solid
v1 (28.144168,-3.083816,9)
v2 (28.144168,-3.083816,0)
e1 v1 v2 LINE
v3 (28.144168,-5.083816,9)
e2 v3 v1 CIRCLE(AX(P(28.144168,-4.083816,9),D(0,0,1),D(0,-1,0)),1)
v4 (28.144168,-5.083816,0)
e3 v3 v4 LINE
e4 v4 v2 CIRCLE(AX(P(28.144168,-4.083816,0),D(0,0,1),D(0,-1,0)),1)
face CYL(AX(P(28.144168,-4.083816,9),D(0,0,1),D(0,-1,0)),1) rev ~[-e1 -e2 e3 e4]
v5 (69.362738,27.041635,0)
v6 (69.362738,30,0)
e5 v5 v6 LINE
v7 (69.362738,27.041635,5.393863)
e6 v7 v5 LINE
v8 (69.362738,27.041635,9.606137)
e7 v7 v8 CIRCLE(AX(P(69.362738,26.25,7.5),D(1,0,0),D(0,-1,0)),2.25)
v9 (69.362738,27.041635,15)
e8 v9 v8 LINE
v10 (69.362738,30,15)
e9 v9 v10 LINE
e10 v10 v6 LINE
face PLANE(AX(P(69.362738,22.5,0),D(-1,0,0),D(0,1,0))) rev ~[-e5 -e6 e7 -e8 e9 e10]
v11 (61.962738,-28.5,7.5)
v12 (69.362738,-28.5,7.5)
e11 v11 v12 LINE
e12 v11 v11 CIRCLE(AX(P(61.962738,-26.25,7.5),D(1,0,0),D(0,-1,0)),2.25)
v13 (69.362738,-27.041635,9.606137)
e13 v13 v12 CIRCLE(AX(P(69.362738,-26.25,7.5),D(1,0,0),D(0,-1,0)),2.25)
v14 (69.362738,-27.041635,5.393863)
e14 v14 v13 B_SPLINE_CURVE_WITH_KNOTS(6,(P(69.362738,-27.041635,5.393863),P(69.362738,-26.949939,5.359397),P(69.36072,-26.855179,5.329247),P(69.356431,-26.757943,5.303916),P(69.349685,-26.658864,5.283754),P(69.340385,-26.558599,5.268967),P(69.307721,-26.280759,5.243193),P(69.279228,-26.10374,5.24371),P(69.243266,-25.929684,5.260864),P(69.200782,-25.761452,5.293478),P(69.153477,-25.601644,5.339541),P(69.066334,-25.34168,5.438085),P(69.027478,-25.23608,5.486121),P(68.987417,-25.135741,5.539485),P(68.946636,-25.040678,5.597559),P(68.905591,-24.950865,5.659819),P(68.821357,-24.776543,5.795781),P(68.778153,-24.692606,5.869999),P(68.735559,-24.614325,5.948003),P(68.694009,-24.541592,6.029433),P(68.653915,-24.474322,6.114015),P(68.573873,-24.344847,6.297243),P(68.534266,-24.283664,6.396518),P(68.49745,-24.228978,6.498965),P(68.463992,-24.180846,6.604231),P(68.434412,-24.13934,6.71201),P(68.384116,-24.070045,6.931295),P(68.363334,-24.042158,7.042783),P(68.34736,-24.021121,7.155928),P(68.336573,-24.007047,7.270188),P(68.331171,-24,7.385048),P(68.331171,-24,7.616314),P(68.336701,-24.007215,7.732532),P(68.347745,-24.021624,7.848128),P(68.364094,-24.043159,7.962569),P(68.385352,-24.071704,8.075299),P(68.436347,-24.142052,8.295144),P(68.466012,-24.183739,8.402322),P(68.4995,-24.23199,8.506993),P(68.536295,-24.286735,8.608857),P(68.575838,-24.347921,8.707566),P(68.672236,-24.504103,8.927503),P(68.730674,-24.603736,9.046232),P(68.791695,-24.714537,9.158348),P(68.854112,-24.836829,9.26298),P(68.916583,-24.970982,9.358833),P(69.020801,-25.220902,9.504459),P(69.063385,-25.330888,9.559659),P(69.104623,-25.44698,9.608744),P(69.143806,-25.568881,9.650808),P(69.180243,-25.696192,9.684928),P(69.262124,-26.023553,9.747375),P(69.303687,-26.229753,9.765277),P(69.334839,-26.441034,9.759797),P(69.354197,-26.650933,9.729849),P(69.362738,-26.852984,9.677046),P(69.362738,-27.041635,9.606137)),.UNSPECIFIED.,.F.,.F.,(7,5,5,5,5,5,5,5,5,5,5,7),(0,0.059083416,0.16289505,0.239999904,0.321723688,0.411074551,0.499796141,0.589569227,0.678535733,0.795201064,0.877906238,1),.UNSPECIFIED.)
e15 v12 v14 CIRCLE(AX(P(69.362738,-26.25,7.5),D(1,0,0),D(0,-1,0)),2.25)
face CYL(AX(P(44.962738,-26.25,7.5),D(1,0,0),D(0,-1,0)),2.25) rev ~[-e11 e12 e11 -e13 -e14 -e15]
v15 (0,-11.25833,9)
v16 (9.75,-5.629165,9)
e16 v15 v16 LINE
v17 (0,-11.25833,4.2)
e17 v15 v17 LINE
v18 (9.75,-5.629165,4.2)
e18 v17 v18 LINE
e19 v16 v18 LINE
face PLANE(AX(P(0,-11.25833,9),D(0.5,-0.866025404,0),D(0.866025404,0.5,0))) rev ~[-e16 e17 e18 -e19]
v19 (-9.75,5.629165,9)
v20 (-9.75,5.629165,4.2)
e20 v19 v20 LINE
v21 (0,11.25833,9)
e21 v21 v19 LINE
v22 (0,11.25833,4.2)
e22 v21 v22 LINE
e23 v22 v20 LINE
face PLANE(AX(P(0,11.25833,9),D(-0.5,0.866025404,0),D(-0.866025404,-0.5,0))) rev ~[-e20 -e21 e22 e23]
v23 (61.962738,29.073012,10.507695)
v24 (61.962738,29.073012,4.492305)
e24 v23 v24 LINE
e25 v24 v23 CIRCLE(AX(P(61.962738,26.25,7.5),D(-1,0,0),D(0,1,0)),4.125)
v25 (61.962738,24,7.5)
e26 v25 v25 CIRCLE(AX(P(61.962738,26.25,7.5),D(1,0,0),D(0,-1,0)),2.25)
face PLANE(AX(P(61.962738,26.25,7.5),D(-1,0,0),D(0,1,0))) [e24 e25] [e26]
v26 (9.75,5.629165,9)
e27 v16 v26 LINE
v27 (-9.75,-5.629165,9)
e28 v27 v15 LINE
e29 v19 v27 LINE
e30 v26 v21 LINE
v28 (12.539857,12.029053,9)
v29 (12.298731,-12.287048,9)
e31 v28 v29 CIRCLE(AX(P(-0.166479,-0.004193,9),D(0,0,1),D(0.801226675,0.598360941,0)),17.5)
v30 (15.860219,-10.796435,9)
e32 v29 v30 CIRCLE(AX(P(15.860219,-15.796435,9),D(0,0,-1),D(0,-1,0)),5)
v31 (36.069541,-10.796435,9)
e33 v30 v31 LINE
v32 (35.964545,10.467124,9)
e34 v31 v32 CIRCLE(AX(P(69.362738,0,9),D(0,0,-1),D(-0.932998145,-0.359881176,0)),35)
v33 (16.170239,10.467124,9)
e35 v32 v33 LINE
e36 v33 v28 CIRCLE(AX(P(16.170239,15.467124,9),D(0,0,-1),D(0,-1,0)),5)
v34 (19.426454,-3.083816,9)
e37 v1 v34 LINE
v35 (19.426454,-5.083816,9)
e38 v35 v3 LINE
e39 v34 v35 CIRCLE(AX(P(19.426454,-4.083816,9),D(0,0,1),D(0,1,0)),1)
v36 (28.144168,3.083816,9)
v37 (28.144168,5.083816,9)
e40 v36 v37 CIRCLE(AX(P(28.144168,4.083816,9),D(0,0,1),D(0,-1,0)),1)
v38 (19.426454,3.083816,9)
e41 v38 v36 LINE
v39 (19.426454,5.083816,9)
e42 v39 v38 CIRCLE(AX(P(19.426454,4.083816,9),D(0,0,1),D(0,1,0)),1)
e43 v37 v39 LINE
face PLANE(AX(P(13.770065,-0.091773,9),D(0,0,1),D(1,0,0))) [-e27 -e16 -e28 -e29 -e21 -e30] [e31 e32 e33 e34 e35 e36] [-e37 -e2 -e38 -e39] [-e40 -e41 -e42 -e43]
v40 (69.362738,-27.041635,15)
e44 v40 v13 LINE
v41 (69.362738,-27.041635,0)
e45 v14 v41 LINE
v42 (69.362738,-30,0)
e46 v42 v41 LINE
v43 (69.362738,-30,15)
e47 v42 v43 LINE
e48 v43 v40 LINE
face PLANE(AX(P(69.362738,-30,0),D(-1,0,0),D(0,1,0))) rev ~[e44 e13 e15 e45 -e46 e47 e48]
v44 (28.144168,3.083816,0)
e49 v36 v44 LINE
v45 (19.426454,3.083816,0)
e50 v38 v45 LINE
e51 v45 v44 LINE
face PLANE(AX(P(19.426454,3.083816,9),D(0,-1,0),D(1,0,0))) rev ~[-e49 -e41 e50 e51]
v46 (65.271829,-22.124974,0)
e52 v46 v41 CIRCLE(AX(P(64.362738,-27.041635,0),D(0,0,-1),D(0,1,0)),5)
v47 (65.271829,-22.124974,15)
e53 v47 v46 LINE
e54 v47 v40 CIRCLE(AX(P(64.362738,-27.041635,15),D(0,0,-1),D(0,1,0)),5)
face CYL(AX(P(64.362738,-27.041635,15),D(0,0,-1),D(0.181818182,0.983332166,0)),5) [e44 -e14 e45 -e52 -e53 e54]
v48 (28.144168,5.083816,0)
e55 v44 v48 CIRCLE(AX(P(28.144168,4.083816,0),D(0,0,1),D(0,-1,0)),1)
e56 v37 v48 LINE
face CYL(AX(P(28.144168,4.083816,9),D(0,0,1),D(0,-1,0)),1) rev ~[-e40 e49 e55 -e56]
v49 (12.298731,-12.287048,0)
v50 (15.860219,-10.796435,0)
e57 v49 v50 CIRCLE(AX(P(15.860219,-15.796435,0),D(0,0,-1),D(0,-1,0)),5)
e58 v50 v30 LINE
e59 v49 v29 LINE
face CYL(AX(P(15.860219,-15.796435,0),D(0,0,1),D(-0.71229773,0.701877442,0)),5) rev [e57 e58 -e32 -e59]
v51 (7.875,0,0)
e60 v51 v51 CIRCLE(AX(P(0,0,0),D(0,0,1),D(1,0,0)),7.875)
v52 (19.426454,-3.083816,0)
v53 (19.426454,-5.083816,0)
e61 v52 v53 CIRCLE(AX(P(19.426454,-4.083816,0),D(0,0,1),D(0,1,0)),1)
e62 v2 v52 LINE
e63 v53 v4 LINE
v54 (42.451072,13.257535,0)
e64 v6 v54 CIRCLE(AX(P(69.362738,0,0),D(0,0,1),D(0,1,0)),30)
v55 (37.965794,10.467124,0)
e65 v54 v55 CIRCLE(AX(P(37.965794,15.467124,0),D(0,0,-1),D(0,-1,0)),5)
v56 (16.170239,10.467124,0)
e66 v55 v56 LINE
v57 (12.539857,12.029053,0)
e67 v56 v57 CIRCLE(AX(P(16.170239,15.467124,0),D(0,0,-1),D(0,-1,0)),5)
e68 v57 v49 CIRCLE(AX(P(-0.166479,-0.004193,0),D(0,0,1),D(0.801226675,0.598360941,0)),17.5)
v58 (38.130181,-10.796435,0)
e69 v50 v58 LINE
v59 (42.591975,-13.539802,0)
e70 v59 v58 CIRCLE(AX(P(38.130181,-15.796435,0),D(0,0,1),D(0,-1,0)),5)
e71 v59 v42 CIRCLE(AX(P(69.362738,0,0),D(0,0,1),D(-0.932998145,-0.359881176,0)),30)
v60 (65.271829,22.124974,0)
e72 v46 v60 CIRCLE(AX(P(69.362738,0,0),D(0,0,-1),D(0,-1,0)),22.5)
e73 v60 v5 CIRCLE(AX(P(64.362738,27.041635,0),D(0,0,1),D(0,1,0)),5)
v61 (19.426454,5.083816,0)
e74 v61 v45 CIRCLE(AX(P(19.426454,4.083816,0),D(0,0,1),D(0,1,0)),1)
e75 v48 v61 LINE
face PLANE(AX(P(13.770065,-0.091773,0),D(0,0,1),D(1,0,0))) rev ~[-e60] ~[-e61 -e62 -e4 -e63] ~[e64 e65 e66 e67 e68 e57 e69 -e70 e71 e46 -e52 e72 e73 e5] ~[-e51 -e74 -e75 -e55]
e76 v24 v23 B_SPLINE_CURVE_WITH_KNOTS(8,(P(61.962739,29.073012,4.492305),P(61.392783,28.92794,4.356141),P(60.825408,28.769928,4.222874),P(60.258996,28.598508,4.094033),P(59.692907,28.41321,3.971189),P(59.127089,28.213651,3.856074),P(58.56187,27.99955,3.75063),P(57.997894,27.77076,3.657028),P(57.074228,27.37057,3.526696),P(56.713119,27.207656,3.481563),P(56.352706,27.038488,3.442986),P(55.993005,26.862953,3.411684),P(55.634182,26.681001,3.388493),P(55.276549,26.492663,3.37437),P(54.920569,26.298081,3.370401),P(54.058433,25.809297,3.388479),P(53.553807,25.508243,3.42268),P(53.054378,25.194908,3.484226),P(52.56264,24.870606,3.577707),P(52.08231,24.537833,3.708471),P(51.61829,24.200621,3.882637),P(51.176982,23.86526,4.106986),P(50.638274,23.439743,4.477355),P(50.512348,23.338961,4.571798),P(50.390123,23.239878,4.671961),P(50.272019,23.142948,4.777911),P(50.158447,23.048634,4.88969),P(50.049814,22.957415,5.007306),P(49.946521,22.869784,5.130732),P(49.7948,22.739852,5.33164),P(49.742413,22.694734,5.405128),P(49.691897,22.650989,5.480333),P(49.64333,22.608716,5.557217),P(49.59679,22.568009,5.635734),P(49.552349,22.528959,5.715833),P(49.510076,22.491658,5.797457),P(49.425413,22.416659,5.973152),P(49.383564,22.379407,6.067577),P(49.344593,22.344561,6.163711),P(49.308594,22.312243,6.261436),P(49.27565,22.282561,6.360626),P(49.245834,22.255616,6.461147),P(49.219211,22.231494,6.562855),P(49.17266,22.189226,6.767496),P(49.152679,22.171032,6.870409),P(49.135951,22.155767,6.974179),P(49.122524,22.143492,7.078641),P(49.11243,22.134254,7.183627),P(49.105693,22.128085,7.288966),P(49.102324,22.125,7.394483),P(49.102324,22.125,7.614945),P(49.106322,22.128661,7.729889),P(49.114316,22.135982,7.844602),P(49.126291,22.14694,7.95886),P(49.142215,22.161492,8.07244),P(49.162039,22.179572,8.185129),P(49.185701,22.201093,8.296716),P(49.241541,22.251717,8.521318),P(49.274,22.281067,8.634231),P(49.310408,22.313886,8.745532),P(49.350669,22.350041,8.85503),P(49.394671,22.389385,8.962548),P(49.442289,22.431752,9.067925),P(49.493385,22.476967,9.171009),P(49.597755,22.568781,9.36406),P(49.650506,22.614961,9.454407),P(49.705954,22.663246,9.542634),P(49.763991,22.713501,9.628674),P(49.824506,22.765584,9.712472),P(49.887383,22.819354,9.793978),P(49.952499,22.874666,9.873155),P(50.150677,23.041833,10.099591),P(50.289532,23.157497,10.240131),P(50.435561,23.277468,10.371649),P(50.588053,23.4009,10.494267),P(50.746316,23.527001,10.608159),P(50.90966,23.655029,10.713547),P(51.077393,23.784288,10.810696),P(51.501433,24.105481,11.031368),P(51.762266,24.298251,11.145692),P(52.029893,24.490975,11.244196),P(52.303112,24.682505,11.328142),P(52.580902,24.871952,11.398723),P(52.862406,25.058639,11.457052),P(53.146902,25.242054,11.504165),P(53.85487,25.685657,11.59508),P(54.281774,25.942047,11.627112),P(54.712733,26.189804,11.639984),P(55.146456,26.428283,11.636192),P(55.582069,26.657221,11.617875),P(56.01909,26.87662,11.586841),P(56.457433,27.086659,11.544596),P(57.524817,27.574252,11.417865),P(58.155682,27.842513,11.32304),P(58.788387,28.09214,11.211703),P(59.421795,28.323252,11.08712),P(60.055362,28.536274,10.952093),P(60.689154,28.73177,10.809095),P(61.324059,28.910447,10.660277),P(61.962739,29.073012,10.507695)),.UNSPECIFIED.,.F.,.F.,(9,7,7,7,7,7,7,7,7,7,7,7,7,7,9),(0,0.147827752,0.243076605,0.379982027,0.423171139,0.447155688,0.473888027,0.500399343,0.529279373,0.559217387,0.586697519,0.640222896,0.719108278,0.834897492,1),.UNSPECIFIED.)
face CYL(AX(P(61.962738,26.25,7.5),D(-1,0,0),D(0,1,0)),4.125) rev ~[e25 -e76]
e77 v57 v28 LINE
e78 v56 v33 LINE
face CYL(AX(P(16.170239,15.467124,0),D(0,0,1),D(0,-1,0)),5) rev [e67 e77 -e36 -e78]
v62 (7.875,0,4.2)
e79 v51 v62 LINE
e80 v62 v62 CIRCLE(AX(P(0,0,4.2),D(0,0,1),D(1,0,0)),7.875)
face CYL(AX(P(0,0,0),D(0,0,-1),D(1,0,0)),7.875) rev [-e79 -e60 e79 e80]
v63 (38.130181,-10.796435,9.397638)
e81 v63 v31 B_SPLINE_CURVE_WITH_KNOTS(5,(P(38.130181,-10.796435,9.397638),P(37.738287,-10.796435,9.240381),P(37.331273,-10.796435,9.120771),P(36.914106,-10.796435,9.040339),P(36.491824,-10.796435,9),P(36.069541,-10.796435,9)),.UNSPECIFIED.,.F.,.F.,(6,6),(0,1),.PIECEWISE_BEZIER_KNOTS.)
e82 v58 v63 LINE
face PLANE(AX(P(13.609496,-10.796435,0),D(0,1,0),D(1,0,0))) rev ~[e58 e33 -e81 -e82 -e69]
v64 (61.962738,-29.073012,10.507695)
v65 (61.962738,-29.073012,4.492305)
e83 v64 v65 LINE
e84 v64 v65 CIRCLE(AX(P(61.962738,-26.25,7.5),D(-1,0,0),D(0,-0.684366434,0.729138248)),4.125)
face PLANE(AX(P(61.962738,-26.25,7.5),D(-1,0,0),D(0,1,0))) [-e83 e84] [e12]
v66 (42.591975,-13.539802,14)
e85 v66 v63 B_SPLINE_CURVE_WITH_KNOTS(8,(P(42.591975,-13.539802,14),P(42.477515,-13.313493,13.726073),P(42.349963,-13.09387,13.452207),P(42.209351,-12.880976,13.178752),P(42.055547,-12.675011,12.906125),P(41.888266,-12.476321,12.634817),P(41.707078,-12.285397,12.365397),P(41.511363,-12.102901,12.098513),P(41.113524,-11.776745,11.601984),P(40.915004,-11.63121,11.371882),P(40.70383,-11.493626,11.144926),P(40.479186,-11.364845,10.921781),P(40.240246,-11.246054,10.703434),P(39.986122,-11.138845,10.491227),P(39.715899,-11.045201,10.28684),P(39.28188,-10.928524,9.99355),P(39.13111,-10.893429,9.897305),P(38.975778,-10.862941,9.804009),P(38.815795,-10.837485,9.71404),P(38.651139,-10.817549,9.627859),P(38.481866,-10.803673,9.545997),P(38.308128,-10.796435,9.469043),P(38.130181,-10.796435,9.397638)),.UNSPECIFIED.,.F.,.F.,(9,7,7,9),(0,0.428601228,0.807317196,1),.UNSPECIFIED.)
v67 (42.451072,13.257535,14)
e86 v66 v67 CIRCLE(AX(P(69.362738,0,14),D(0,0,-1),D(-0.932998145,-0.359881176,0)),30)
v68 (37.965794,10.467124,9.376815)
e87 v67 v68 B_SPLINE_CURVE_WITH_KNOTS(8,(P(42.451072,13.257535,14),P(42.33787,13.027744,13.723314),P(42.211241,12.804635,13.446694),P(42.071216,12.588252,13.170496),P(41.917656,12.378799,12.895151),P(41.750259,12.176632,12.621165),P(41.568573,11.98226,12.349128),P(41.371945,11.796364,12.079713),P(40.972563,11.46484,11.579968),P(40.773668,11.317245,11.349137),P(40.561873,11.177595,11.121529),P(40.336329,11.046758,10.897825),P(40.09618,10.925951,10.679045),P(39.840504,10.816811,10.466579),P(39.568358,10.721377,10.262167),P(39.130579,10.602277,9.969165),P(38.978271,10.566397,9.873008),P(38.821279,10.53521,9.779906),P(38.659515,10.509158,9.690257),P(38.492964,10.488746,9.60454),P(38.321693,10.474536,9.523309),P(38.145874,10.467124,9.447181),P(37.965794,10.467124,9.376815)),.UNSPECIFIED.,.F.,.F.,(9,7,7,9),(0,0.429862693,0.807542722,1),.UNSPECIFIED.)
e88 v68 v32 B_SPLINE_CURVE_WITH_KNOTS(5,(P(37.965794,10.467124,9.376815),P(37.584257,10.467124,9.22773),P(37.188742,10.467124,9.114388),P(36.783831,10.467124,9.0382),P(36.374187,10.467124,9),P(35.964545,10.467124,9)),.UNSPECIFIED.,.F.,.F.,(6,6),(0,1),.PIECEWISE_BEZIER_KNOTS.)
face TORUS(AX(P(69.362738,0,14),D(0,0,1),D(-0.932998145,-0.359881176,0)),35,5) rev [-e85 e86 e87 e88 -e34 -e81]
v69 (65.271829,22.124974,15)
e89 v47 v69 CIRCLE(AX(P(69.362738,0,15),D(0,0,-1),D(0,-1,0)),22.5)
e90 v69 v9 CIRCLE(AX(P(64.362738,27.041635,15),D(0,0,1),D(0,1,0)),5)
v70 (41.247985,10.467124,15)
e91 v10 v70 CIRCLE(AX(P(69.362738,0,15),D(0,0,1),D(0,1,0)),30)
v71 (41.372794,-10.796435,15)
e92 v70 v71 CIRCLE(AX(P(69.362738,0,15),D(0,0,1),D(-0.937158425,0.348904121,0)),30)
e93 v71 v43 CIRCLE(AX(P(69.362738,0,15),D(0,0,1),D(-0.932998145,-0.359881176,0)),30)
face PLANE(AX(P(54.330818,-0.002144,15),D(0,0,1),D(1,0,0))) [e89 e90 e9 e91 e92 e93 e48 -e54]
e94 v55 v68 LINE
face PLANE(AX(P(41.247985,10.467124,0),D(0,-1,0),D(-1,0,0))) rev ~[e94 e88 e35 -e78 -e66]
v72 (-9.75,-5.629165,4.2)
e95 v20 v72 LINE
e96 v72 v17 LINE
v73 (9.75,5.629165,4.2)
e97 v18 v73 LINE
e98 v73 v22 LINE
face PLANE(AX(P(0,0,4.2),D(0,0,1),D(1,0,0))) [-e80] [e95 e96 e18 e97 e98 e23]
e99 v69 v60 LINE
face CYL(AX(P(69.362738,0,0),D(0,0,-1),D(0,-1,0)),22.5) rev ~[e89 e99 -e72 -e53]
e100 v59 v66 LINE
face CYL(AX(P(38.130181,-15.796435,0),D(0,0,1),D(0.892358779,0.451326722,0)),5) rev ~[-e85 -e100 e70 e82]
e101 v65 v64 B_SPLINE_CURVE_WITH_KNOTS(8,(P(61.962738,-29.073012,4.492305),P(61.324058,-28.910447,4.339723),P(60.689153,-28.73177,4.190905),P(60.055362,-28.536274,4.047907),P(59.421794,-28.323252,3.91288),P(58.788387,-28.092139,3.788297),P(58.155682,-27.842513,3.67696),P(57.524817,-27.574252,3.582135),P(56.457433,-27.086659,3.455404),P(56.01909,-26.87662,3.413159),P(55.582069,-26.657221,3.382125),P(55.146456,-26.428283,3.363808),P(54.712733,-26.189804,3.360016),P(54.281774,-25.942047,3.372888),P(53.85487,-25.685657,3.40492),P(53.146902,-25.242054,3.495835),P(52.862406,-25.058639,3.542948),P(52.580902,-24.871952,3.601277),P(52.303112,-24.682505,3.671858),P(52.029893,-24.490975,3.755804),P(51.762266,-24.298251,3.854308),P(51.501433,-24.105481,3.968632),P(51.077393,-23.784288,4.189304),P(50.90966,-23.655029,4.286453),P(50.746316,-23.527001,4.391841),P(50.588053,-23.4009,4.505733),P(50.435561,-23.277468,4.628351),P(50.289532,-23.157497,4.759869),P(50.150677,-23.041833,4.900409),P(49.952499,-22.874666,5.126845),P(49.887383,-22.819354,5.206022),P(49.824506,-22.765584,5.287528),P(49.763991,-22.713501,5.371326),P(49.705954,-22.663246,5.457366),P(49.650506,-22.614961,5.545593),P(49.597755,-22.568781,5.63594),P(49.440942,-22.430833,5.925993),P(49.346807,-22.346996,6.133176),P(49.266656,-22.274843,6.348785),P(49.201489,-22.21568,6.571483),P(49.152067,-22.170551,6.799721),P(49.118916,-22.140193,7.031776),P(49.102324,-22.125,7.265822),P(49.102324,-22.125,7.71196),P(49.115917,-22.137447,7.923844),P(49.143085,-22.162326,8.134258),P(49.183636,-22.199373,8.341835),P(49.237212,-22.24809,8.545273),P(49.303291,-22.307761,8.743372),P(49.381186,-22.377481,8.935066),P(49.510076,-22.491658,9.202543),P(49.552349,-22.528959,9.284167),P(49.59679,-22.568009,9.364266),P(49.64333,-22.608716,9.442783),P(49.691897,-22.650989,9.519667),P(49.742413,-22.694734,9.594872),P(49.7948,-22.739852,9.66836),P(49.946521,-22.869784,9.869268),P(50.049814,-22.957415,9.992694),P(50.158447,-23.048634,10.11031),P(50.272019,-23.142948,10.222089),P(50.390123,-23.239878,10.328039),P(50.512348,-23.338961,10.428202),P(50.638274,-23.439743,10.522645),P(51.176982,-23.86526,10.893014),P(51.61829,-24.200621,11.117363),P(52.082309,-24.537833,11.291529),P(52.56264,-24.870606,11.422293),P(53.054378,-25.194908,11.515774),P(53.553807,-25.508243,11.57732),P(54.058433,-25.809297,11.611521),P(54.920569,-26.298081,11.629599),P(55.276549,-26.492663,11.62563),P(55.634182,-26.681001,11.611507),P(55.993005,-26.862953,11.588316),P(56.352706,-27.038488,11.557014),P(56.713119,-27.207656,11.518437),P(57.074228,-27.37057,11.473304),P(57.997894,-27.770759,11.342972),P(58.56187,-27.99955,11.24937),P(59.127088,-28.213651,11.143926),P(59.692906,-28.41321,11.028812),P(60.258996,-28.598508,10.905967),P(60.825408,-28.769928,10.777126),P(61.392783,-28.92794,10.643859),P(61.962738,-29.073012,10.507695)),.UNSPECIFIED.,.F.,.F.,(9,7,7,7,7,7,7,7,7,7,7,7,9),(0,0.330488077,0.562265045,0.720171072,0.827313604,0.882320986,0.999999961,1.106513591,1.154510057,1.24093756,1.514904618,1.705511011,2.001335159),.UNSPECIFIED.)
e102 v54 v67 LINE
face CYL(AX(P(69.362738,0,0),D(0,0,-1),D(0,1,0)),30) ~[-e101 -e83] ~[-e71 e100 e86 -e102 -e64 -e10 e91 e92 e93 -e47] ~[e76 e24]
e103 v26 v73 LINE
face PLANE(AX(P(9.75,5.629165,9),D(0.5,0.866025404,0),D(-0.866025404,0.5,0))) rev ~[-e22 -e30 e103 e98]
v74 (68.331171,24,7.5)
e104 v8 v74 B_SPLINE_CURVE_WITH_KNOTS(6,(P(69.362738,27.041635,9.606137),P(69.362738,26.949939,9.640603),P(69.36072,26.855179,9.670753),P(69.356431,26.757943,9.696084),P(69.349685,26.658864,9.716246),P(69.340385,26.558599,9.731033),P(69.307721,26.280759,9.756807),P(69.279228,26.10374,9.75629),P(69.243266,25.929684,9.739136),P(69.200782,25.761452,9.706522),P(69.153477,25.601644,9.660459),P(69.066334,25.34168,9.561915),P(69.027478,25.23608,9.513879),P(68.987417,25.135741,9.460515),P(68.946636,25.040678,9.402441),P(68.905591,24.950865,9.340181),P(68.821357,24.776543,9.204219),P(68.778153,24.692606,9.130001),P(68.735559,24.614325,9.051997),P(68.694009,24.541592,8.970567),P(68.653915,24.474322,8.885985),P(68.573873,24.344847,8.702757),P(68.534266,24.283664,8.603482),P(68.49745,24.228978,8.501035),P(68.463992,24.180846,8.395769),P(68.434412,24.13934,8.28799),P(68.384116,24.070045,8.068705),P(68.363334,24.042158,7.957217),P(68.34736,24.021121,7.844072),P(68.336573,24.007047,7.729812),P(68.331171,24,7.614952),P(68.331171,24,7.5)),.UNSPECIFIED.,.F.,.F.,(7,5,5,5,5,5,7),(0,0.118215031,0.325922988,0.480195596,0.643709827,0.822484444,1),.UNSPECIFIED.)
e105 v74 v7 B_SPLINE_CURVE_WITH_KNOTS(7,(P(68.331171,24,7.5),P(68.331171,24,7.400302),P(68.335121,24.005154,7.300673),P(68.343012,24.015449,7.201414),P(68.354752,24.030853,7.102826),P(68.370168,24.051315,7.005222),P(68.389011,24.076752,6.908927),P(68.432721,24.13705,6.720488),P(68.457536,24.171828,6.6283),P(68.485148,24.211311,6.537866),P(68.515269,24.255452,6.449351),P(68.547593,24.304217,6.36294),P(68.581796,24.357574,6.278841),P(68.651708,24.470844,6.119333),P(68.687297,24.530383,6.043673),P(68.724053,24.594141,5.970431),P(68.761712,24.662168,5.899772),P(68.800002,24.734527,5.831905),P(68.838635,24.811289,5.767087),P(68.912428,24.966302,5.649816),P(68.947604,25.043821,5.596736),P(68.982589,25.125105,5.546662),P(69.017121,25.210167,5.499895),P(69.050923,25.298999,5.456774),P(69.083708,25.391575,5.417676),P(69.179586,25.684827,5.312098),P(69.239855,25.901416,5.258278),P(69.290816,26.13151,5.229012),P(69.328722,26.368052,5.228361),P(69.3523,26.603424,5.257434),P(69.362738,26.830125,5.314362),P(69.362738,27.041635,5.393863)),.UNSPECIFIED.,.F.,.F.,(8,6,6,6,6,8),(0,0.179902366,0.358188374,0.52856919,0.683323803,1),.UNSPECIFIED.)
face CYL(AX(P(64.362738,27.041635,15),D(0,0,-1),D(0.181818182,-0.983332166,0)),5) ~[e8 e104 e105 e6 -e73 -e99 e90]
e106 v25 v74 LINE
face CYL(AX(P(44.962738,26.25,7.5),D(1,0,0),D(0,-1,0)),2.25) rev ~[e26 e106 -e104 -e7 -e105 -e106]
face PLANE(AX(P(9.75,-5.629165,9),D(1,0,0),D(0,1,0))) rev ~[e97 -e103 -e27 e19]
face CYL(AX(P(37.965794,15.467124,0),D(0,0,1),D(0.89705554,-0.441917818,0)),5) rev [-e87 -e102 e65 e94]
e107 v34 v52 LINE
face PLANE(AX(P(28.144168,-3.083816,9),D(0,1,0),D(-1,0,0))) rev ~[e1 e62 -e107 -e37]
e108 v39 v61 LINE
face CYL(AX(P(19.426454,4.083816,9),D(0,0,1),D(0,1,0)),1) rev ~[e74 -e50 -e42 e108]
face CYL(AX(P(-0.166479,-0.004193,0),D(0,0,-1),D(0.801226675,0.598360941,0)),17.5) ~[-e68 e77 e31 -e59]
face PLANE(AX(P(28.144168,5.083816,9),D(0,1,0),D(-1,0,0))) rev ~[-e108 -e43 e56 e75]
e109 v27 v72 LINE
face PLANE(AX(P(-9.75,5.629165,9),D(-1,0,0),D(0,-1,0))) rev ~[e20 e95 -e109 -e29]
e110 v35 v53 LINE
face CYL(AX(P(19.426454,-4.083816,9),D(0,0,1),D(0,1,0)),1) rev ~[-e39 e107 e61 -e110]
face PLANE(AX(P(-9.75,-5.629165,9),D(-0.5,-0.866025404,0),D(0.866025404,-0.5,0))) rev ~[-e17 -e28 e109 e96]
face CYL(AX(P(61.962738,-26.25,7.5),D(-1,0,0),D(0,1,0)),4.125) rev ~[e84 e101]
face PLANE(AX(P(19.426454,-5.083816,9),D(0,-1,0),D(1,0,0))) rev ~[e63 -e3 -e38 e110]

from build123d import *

# Parameters (mm, degrees)
F0_R           = 7.875
F1_DEPTH       = 9
F2_R           = 7.875
F3_DEPTH       = 4.8
F4_DEPTH       = 15
F5_R           = 5
F8_D           = 4.5
F8_DEPTH       = 25
F8_CBORE_D     = 8.25
F8_CBORE_DEPTH = 17
F8_TIP         = 1.3519363928
F11_DEPTH      = 25


# Not quite as in the source:
# - two fillets or chamfers of one size are made in one step


with BuildPart() as f1:
    # F0 (on Top) → F1 (new body)
    with BuildSketch(Plane.XY):
        with BuildLine():
            ThreePointArc((13.8549873727, 10.4671236312), (-17.6653132634, 0.1978340536), (13.609496128, -10.7964352789))
            Line((13.609496128, -10.7964352789), (41.3727938251, -10.7964352789))
            ThreePointArc((41.3727938251, -10.7964352789), (39.3632549532, -0.1760847087), (41.2479854227, 10.4671236312))
            Line((41.2479854227, 10.4671236312), (13.8549873727, 10.4671236312))
        make_face()
        Circle(F0_R, mode=Mode.SUBTRACT)
        with BuildLine():
            ThreePointArc((41.2479854227, 10.4671236312), (39.3632549532, -0.1760847087), (41.3727938251, -10.7964352789))
            ThreePointArc((41.3727938251, -10.7964352789), (52.3906001106, -24.7375530153), (69.362738185, -30))
            Line((69.362738185, -30), (69.362738185, -22.5))
            ThreePointArc((69.362738185, -22.5), (46.862738185, 0), (69.362738185, 22.5))
            Line((69.362738185, 22.5), (69.362738185, 30))
            ThreePointArc((69.362738185, 30), (52.2456956387, 24.6375090963), (41.2479854227, 10.4671236312))
        make_face()
    extrude(amount=F1_DEPTH)

    # F2 (on face) → F3 (cut)
    with BuildSketch(Plane.XY.offset(9)):
        Polygon((9.75, -5.6291651246), (9.75, 5.6291651246), (0, 11.2583302492), (-9.75, 5.6291651246), (-9.75, -5.6291651246), (0, -11.2583302492), align=None)
        Circle(F2_R, mode=Mode.SUBTRACT)
    extrude(amount=-F3_DEPTH, mode=Mode.SUBTRACT)

    # F0 (on Top) → F4 (join)
    with BuildSketch(Plane.XY):
        with BuildLine():
            ThreePointArc((41.2479854227, 10.4671236312), (39.3632549532, -0.1760847087), (41.3727938251, -10.7964352789))
            ThreePointArc((41.3727938251, -10.7964352789), (52.3906001106, -24.7375530153), (69.362738185, -30))
            Line((69.362738185, -30), (69.362738185, -22.5))
            ThreePointArc((69.362738185, -22.5), (46.862738185, 0), (69.362738185, 22.5))
            Line((69.362738185, 22.5), (69.362738185, 30))
            ThreePointArc((69.362738185, 30), (52.2456956387, 24.6375090963), (41.2479854227, 10.4671236312))
        make_face()
    extrude(amount=F4_DEPTH)

    # F5
    f5_edges = [f1.edges().sort_by_distance(p)[0] for p in [
        (13.609496, -10.796435, 4.5),
        (41.247985, 10.467124, 4.5),
        (41.372794, -10.796435, 4.5),
        (39.363255, -0.176085, 9),
        (13.854987, 10.467124, 4.5),
        (69.362738, -22.5, 7.5),
        (69.362738, 22.5, 7.5),
    ]]
    fillet(f5_edges, radius=F5_R)

    # F8
    with Locations(Plane(origin=(44.962738185, 0, 0), x_dir=(0, 1, 0), z_dir=(-1, 0, 0))):
        with Locations((26.25, -7.5), (-26.25, -7.5)):
            CounterBoreHole(F8_D / 2, F8_CBORE_D / 2, F8_CBORE_DEPTH, depth=F8_DEPTH)
            with Locations((0, 0, -(F8_DEPTH + F8_TIP / 2))):  # 118° drill point
                Cone(0, F8_D / 2, F8_TIP, mode=Mode.SUBTRACT)

    # F10 (on face) → F11 (cut)
    with BuildSketch(Plane.XY.offset(9)):
        with BuildLine():
            ThreePointArc((19.4264538586, 5.0838164277), (18.4264538586, 4.0838164277), (19.4264538586, 3.0838164277))
            Line((19.4264538586, 3.0838164277), (28.1441677362, 3.0838164277))
            ThreePointArc((28.1441677362, 3.0838164277), (29.1441677362, 4.0838164277), (28.1441677362, 5.0838164277))
            Line((28.1441677362, 5.0838164277), (19.4264538586, 5.0838164277))
        make_face()
        with BuildLine():
            Line((28.1441677362, -3.0838164277), (19.4264538586, -3.0838164277))
            ThreePointArc((19.4264538586, -3.0838164277), (18.4264538586, -4.0838164277), (19.4264538586, -5.0838164277))
            Line((19.4264538586, -5.0838164277), (28.1441677362, -5.0838164277))
            ThreePointArc((28.1441677362, -5.0838164277), (29.1441677362, -4.0838164277), (28.1441677362, -3.0838164277))
        make_face()
    extrude(amount=-F11_DEPTH, mode=Mode.SUBTRACT)


solid = f1.part
